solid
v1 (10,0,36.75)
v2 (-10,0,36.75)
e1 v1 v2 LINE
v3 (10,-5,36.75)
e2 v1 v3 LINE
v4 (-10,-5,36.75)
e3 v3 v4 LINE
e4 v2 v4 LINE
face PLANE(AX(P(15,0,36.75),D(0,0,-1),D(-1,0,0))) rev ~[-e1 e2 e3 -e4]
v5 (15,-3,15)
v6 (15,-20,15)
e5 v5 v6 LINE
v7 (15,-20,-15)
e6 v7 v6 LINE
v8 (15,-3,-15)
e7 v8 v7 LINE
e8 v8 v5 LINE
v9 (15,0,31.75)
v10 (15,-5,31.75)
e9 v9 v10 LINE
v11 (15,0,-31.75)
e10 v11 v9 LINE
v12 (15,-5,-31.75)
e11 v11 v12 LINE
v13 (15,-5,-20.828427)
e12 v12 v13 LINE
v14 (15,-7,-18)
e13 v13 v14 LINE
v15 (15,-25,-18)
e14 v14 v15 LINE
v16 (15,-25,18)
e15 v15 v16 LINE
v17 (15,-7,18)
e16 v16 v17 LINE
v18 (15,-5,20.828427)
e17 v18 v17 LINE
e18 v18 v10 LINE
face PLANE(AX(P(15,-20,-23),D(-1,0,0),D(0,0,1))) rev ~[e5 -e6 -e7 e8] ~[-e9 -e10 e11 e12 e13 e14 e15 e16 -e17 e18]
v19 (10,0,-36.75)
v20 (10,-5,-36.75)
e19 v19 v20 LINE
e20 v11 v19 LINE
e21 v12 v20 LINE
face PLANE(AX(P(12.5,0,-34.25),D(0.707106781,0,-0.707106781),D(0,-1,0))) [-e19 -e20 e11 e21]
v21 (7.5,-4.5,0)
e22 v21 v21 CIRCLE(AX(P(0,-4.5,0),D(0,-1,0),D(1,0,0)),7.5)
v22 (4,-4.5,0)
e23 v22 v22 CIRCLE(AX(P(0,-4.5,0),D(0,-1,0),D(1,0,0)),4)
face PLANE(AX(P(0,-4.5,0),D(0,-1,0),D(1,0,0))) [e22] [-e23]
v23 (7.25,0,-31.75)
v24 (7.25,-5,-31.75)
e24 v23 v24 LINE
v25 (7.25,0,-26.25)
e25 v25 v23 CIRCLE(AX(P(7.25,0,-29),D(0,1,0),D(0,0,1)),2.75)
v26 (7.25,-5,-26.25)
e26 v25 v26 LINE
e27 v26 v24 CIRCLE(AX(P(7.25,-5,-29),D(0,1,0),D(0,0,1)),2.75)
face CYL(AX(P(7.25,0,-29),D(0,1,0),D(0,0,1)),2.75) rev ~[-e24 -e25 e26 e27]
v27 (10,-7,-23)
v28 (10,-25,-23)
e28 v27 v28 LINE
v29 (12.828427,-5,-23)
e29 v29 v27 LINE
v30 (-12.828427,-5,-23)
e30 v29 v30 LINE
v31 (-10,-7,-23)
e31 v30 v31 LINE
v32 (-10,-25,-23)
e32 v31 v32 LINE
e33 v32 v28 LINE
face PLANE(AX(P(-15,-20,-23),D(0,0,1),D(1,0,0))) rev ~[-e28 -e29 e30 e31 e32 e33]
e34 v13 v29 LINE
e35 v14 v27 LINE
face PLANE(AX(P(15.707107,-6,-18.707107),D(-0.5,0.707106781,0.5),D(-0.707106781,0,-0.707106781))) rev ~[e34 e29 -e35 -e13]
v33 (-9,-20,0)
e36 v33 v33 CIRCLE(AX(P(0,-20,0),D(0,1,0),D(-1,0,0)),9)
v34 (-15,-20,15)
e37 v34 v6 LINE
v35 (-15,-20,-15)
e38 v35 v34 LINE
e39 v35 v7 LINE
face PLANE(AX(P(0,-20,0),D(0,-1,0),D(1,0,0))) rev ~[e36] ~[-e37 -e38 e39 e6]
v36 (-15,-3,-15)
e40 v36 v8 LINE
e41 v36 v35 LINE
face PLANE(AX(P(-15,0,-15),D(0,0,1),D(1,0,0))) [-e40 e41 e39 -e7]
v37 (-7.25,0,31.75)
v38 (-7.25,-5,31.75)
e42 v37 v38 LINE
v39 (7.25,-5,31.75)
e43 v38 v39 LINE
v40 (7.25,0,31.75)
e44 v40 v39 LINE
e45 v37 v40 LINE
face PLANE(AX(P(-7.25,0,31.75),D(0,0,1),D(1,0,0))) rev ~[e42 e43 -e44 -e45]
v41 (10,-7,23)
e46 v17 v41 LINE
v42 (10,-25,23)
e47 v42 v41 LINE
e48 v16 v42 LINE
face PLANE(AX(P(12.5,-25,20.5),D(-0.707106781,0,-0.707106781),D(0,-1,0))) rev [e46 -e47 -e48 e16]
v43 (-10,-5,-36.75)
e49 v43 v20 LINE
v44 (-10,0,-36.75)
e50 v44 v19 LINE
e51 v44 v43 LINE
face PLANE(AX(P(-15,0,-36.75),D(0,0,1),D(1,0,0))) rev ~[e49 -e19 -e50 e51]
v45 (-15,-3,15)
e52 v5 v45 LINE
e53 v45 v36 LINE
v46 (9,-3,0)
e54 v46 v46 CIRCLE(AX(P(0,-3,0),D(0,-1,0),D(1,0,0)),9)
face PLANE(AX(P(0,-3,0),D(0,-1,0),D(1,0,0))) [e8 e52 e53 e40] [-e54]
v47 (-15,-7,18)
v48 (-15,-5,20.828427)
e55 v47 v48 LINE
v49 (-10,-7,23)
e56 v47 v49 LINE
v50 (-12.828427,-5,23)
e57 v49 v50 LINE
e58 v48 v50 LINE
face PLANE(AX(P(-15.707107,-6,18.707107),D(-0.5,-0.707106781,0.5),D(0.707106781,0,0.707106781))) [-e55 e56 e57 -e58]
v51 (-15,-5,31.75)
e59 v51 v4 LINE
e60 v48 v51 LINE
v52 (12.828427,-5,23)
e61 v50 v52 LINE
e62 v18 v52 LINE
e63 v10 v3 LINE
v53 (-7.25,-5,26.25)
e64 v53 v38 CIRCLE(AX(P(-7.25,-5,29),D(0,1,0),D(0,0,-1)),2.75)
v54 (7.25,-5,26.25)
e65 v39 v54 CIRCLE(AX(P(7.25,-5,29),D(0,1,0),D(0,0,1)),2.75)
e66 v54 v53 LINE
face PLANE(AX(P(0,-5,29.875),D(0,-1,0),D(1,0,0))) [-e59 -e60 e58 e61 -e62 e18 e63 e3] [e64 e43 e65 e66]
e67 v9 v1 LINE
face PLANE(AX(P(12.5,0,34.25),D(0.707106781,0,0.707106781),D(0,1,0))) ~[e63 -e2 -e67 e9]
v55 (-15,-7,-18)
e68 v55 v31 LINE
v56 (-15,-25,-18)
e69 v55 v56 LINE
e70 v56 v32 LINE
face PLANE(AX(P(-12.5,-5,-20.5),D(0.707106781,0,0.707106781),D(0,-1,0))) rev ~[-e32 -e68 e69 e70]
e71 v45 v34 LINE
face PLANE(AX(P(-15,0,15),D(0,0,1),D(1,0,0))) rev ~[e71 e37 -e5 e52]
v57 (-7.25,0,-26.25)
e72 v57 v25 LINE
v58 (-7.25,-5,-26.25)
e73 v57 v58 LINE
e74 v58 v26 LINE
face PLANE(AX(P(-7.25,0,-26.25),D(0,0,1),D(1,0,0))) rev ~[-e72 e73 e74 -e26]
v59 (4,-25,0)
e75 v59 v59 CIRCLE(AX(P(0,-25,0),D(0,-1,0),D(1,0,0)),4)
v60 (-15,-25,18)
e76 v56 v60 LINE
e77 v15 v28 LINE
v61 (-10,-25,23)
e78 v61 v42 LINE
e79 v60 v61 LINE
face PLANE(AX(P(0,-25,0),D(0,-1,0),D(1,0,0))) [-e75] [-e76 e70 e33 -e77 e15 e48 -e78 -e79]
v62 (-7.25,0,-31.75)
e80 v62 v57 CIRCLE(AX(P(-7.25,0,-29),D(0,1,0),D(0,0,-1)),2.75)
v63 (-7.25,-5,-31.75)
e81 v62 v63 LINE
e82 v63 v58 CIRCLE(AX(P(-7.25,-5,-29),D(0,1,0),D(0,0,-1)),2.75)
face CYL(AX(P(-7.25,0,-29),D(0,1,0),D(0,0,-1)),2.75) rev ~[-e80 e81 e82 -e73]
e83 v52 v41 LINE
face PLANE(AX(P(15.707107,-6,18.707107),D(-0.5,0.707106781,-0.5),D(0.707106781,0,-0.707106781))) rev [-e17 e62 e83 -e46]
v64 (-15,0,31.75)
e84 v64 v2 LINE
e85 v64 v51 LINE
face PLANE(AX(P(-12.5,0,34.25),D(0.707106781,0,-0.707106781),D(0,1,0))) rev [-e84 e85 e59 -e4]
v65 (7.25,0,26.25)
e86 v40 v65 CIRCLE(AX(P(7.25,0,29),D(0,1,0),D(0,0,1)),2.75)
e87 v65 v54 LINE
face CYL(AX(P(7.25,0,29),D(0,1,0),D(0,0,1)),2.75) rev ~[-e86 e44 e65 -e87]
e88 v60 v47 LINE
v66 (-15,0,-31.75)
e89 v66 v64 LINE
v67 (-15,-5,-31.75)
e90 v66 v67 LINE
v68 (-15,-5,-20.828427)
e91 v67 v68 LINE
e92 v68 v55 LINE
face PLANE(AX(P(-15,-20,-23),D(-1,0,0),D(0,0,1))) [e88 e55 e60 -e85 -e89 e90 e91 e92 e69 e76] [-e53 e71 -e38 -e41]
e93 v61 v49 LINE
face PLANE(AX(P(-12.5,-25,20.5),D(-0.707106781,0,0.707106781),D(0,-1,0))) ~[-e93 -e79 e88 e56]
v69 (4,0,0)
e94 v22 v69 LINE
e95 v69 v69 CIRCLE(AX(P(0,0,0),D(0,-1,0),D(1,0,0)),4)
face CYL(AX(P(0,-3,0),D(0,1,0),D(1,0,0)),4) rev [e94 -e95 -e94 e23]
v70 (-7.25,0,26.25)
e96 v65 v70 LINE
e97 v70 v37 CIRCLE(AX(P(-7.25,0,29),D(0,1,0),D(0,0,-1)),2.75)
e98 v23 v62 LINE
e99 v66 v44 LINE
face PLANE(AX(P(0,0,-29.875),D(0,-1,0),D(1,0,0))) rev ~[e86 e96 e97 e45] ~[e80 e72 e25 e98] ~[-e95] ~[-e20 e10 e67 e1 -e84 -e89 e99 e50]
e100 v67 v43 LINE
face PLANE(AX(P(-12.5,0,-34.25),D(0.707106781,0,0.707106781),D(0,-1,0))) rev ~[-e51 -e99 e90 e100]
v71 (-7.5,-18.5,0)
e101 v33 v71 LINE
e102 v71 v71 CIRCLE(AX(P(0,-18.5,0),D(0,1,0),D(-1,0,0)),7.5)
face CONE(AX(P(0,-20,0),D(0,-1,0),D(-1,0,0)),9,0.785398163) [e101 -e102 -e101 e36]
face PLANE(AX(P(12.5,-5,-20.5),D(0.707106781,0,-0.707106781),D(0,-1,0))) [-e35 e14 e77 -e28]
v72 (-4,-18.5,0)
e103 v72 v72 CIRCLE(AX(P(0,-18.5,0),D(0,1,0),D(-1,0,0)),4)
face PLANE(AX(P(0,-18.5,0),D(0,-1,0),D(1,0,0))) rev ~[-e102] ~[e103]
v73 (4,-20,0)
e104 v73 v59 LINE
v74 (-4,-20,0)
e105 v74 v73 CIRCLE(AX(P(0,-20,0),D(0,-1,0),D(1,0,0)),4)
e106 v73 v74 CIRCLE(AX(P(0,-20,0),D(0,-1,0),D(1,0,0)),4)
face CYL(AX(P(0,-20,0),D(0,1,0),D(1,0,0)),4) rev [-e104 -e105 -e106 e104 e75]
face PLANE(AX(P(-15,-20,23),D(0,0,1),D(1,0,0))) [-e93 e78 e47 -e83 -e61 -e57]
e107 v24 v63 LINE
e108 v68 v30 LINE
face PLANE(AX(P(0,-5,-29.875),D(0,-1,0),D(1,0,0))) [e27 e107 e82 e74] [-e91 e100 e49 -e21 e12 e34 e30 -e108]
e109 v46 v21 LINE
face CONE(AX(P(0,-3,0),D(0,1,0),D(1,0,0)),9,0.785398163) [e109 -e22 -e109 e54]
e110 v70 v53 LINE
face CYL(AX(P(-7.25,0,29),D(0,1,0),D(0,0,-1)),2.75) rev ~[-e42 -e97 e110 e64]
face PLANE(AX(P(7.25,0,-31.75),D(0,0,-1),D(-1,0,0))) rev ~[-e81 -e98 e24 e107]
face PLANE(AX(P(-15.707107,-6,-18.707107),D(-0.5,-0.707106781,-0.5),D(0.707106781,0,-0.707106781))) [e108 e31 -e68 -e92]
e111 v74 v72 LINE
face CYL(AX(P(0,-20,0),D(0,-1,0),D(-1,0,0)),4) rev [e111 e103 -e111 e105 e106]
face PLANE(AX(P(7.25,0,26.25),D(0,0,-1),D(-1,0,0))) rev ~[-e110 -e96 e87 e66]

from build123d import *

# Parameters (mm, degrees)
F0_R     = 11
F0_R_2   = 4
F1_DEPTH = 3
F0_W     = 30
F0_H     = 8
F2_DEPTH = 20
F3_DEPTH = 5
F4_W     = 30
F4_H     = 46
F4_R     = 4
F5_DEPTH = 5
F6_R     = 7
F6_R_2   = 4
F7_DEPTH = 1.5
F8_R     = 7
F8_R_2   = 4
F9_DEPTH = 1.5
F10_SIZE = 5
F12_SIZE = 2


# Not quite as in the source:
# - a fillet or chamfer that OpenCascade refuses, or shapes differently, is made with other operations: its cross-section is extruded or revolved along the edge and cut away or added


with BuildPart() as f1:
    # F0 (on Front) → F1 (new body)
    with BuildSketch(Plane.XZ):
        Polygon((15, 15), (-15, 15), (-15, 0), (-15, -15), (15, -15), (15, 0), align=None)
        Circle(F0_R, mode=Mode.SUBTRACT)
        Circle(F0_R)
        Circle(F0_R_2, mode=Mode.SUBTRACT)
    extrude(amount=F1_DEPTH)

    # F0 (on Front) → F2 (join)
    with BuildSketch(Plane.XZ):
        with Locations((0, 19)):
            Rectangle(F0_W, F0_H)
        with Locations((0, -19)):
            Rectangle(F0_W, F0_H)
    extrude(amount=F2_DEPTH)

    # F0 (on Front) → F3 (join)
    with BuildSketch(Plane.XZ):
        Polygon((15, -23), (-15, -23), (-15, -36.75), (0, -36.75), (15, -36.75), align=None)
        with BuildLine():
            ThreePointArc((-7.25, -31.75), (-10, -29), (-7.25, -26.25))
            Line((-7.25, -26.25), (7.25, -26.25))
            ThreePointArc((7.25, -26.25), (10, -29), (7.25, -31.75))
            Line((7.25, -31.75), (-7.25, -31.75))
        make_face(mode=Mode.SUBTRACT)
        Polygon((-15, 36.75), (-15, 23), (15, 23), (15, 36.75), (0, 36.75), align=None)
        with BuildLine():
            ThreePointArc((-7.25, 26.25), (-10, 29), (-7.25, 31.75))
            Line((-7.25, 31.75), (7.25, 31.75))
            ThreePointArc((7.25, 31.75), (10, 29), (7.25, 26.25))
            Line((7.25, 26.25), (-7.25, 26.25))
        make_face(mode=Mode.SUBTRACT)
    extrude(amount=F3_DEPTH)

    # F4 (on face) → F5 (join)
    with BuildSketch(Plane.XZ.offset(20)):
        Rectangle(F4_W, F4_H)
        Circle(F4_R, mode=Mode.SUBTRACT)
    extrude(amount=F5_DEPTH)

    # F6 (on face) → F7 (join)
    with BuildSketch(Plane.XZ.offset(3)):
        Circle(F6_R)
        Circle(F6_R_2, mode=Mode.SUBTRACT)
    extrude(amount=F7_DEPTH)

    # F8 (on face) → F9 (join)
    with BuildSketch(Plane(origin=(0, -20, 0), x_dir=(-1, 0, 0), z_dir=(0, 1, 0))):
        Circle(F8_R)
        Circle(F8_R_2, mode=Mode.SUBTRACT)
    extrude(amount=F9_DEPTH)

    # F10
    f10_edges = [f1.edges().sort_by_distance(p)[0] for p in [
        (15, -2.5, 36.75),
        (-15, -2.5, 36.75),
        (15, -2.5, -36.75),
        (-15, -2.5, -36.75),
        (-15, -15, 23),
        (15, -15, 23),
        (15, -15, -23),
        (-15, -15, -23),
    ]]
    chamfer(f10_edges, length=F10_SIZE)

    # F11: chamfer of 2 on 2 edges, made by hand


with BuildPart() as f11_tool2:
    # F11_s3 → F11_t4 (revolve)
    with BuildSketch(Plane.XY):
        Polygon((9, -3), (7, -5), (7, -3), align=None)
    revolve(axis=Axis((0, -3, 0), (0, -1, 0)))

    split(bisect_by=Plane.XZ.offset(4.5), keep=Keep.BOTTOM)


with BuildPart() as f1_1:
    add(f1.part)

    # F11_t1: union F11_tool2
    add(f11_tool2.part)


with BuildPart() as f11_tool7:
    # F11_s8 → F11_t9 (revolve)
    with BuildSketch(Plane.XY):
        Polygon((-9, -20), (-7, -18), (-7, -20), align=None)
    revolve(axis=Axis((0, -20, 0), (0, 1, 0)))

    split(bisect_by=Plane.XZ.offset(18.5), keep=Keep.TOP)


with BuildPart() as f1_2:
    add(f1_1.part)

    # F11_t6: union F11_tool7
    add(f11_tool7.part)

    # F12
    f12_edges = [f1_2.edges().sort_by_distance(p)[0] for p in [
        (12.5, -5, 20.5),
        (-12.5, -5, 20.5),
        (-12.5, -5, -20.5),
        (12.5, -5, -20.5),
    ]]
    chamfer(f12_edges, length=F12_SIZE)


solid = f1_2.part
